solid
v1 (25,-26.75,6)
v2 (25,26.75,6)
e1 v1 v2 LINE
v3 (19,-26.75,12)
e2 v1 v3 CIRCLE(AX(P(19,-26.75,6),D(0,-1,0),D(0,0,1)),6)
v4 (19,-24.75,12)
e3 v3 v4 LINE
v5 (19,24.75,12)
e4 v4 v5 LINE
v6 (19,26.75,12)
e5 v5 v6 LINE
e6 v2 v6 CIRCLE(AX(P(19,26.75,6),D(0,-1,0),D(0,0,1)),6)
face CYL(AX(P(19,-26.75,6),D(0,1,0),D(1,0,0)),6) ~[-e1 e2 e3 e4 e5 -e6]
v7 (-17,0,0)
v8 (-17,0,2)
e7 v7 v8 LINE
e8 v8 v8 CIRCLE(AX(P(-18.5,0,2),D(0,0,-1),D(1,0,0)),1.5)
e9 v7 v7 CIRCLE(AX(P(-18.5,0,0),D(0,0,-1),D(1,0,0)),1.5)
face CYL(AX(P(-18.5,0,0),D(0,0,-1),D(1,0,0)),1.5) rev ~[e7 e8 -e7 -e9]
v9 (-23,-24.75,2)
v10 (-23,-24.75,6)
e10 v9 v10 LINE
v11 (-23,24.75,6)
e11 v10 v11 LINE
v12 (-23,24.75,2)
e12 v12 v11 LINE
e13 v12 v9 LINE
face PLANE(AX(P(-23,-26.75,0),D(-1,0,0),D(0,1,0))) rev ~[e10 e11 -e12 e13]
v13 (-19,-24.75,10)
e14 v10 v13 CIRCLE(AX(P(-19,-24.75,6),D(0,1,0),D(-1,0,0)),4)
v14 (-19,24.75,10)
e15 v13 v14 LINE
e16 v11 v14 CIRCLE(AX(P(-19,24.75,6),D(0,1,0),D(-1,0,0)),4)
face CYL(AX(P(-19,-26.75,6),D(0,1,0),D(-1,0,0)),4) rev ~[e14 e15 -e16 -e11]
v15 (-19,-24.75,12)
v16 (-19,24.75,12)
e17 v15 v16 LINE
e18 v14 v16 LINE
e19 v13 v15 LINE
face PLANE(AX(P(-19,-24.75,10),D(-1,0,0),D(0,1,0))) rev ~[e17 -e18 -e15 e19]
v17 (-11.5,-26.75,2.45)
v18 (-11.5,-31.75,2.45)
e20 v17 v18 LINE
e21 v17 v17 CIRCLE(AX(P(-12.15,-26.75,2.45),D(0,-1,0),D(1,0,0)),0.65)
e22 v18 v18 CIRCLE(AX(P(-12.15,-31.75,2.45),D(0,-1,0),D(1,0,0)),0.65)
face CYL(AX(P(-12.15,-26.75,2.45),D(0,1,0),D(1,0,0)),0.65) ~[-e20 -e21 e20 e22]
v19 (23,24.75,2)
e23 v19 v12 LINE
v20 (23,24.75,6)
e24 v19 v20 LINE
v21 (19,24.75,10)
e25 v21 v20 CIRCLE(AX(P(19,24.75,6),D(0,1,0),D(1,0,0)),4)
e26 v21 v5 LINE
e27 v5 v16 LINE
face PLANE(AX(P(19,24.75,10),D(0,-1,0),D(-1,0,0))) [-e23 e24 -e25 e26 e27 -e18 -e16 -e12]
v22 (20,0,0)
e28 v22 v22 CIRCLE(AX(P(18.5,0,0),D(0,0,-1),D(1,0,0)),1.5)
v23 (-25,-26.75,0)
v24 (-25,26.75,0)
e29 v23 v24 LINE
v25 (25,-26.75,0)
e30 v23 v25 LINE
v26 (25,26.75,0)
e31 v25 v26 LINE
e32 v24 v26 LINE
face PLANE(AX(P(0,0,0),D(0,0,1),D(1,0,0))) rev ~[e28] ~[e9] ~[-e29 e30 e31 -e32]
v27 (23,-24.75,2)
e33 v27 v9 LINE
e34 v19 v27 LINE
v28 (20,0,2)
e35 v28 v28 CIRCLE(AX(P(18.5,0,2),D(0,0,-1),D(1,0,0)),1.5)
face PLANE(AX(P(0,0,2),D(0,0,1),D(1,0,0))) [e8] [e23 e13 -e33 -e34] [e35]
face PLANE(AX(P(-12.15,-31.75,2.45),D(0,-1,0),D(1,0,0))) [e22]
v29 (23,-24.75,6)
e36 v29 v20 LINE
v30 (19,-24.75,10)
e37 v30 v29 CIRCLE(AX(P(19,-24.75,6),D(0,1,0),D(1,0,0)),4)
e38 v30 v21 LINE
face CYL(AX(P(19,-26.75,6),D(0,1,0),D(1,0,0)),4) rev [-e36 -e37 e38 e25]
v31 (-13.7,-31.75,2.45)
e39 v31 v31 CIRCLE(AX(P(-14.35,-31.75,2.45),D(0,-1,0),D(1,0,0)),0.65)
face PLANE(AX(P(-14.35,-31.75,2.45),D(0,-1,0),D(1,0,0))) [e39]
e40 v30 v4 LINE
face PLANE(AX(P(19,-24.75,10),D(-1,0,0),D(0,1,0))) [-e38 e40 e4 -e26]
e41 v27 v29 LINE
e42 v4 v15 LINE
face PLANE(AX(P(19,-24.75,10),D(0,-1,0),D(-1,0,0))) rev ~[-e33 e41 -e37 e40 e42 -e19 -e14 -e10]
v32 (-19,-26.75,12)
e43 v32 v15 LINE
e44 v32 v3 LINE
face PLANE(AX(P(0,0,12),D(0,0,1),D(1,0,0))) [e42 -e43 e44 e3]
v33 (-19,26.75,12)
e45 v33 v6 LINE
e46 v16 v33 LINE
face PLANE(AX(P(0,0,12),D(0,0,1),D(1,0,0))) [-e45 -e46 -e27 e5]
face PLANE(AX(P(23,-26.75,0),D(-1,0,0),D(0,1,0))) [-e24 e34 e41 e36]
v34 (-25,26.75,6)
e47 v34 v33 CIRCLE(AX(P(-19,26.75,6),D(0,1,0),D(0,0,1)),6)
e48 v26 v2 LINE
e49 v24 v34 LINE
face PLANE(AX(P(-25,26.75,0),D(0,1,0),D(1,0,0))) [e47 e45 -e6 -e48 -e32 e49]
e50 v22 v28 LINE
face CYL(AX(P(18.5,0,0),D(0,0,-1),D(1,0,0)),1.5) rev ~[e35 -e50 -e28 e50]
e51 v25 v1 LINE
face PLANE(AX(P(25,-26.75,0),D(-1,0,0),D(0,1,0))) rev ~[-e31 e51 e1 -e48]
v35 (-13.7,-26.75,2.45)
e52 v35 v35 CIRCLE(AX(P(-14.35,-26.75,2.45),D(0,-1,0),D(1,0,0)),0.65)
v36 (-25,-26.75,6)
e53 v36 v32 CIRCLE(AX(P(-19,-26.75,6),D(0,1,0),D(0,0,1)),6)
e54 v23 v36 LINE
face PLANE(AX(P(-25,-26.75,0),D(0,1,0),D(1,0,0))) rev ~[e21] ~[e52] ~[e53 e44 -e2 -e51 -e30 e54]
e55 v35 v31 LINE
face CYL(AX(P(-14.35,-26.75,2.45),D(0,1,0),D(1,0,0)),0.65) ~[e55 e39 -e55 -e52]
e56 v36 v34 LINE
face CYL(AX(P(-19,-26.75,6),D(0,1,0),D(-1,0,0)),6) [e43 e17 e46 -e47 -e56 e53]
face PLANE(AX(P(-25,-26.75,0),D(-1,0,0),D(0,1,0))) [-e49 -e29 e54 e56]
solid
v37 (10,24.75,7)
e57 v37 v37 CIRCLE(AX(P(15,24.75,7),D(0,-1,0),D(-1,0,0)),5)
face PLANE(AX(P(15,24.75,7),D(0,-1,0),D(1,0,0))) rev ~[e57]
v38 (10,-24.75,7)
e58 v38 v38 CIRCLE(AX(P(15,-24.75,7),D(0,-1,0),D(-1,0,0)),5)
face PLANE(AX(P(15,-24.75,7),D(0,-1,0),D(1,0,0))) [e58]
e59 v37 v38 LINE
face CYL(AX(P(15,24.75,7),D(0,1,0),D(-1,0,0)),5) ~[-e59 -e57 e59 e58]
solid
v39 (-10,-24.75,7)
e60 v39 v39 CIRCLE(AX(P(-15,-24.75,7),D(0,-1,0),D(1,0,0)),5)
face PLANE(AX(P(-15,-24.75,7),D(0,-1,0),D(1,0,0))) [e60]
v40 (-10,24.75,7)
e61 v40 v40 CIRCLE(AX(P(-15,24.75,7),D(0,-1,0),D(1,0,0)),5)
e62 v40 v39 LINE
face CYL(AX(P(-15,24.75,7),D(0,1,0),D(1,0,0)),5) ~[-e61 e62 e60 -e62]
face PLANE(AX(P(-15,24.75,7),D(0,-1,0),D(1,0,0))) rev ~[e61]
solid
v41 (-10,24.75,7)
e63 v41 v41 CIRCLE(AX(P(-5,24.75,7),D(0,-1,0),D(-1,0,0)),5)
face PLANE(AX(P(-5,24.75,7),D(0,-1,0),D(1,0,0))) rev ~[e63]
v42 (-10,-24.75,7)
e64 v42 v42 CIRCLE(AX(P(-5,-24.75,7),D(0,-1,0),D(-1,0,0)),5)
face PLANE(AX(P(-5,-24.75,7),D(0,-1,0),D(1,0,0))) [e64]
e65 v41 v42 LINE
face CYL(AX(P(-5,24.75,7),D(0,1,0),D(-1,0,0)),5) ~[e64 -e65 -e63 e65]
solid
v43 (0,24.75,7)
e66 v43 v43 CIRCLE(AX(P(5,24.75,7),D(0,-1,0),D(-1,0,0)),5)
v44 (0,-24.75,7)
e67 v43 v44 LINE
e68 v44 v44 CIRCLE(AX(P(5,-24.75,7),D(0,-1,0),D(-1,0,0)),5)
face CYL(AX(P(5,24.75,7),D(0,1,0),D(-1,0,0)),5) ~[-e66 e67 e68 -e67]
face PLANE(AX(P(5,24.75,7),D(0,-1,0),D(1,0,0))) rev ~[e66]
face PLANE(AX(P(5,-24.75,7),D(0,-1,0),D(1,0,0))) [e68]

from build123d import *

# Parameters (mm, degrees)
F0_W     = 50
F0_H     = 53.5
F1_DEPTH = 12
F2_R     = 6
F3_T     = -2
F4_R     = 1.5
F5_DEPTH = 3
F6_R     = 0.65
F7_DEPTH = 5
F8_R     = 5
F9_DEPTH = 49.5


# Not quite as in the source:
# - a shell that OpenCascade refuses in one call is made with other operations: the cavity is built on its own and cut out


with BuildPart() as f1:
    # F0 (on Top) → F1 (new body)
    with BuildSketch(Plane.XY):
        Rectangle(F0_W, F0_H)
    extrude(amount=F1_DEPTH)

    # F2
    f2_edges = [f1.edges().sort_by_distance(p)[0] for p in [
        (25, 0, 12),
        (-25, 0, 12),
    ]]
    fillet(f2_edges, radius=F2_R)

    # F3: a shell. OpenCascade refuses it in one call, so the cavity is built on its own and cut out:
    # the body offset inwards by the wall thickness, plus a prism from it out through each open face.
    f3_core = offset(f1.part, amount=F3_T, mode=Mode.PRIVATE)
    f3_exits = [f3_core.faces().sort_by_distance(p)[0] for p in [
        (0, 0, 10),
    ]]
    add(f3_core, mode=Mode.SUBTRACT)
    extrude(f3_exits, amount=-F3_T, mode=Mode.SUBTRACT)

    # F4 (on face) → F5 (cut)
    with BuildSketch(Plane(origin=(0, 0, 0), x_dir=(1, 0, 0), z_dir=(0, 0, -1))):
        with Locations((-18.5, 0)):
            Circle(F4_R)
        with Locations((18.5, 0)):
            Circle(F4_R)
    extrude(amount=-F5_DEPTH, mode=Mode.SUBTRACT)

    # F6 (on face) → F7 (join)
    with BuildSketch(Plane.XZ.offset(26.75)):
        with Locations((-14.35, 2.45)):
            Circle(F6_R)
        with Locations((-12.15, 2.45)):
            Circle(F6_R)
    extrude(amount=F7_DEPTH)


with BuildPart() as f9:
    # F8 (on face) → F9 (new body, through all)
    with BuildSketch(Plane.XZ.offset(-24.75)):
        with Locations((-15, 7)):
            Circle(F8_R)
    extrude(amount=F9_DEPTH)


with BuildPart() as f9b:
    # F8 (on face) → F9, piece 2 (new body, through all)
    with BuildSketch(Plane.XZ.offset(-24.75)):
        with BuildLine():
            ThreePointArc((20, 7), (15, 12), (10, 7))
            ThreePointArc((10, 7), (15, 2), (20, 7))
        make_face()
    extrude(amount=F9_DEPTH)


with BuildPart() as f9c:
    # F8 (on face) → F9, piece 3 (new body, through all)
    with BuildSketch(Plane.XZ.offset(-24.75)):
        with BuildLine():
            ThreePointArc((10, 7), (5, 12), (0, 7))
            ThreePointArc((0, 7), (5, 2), (10, 7))
        make_face()
    extrude(amount=F9_DEPTH)


with BuildPart() as f9d:
    # F8 (on face) → F9, piece 4 (new body, through all)
    with BuildSketch(Plane.XZ.offset(-24.75)):
        with BuildLine():
            ThreePointArc((0, 7), (-5, 12), (-10, 7))
            ThreePointArc((-10, 7), (-5, 2), (0, 7))
        make_face()
    extrude(amount=F9_DEPTH)


solid = Compound([f1.part, f9.part, f9b.part, f9c.part, f9d.part])
